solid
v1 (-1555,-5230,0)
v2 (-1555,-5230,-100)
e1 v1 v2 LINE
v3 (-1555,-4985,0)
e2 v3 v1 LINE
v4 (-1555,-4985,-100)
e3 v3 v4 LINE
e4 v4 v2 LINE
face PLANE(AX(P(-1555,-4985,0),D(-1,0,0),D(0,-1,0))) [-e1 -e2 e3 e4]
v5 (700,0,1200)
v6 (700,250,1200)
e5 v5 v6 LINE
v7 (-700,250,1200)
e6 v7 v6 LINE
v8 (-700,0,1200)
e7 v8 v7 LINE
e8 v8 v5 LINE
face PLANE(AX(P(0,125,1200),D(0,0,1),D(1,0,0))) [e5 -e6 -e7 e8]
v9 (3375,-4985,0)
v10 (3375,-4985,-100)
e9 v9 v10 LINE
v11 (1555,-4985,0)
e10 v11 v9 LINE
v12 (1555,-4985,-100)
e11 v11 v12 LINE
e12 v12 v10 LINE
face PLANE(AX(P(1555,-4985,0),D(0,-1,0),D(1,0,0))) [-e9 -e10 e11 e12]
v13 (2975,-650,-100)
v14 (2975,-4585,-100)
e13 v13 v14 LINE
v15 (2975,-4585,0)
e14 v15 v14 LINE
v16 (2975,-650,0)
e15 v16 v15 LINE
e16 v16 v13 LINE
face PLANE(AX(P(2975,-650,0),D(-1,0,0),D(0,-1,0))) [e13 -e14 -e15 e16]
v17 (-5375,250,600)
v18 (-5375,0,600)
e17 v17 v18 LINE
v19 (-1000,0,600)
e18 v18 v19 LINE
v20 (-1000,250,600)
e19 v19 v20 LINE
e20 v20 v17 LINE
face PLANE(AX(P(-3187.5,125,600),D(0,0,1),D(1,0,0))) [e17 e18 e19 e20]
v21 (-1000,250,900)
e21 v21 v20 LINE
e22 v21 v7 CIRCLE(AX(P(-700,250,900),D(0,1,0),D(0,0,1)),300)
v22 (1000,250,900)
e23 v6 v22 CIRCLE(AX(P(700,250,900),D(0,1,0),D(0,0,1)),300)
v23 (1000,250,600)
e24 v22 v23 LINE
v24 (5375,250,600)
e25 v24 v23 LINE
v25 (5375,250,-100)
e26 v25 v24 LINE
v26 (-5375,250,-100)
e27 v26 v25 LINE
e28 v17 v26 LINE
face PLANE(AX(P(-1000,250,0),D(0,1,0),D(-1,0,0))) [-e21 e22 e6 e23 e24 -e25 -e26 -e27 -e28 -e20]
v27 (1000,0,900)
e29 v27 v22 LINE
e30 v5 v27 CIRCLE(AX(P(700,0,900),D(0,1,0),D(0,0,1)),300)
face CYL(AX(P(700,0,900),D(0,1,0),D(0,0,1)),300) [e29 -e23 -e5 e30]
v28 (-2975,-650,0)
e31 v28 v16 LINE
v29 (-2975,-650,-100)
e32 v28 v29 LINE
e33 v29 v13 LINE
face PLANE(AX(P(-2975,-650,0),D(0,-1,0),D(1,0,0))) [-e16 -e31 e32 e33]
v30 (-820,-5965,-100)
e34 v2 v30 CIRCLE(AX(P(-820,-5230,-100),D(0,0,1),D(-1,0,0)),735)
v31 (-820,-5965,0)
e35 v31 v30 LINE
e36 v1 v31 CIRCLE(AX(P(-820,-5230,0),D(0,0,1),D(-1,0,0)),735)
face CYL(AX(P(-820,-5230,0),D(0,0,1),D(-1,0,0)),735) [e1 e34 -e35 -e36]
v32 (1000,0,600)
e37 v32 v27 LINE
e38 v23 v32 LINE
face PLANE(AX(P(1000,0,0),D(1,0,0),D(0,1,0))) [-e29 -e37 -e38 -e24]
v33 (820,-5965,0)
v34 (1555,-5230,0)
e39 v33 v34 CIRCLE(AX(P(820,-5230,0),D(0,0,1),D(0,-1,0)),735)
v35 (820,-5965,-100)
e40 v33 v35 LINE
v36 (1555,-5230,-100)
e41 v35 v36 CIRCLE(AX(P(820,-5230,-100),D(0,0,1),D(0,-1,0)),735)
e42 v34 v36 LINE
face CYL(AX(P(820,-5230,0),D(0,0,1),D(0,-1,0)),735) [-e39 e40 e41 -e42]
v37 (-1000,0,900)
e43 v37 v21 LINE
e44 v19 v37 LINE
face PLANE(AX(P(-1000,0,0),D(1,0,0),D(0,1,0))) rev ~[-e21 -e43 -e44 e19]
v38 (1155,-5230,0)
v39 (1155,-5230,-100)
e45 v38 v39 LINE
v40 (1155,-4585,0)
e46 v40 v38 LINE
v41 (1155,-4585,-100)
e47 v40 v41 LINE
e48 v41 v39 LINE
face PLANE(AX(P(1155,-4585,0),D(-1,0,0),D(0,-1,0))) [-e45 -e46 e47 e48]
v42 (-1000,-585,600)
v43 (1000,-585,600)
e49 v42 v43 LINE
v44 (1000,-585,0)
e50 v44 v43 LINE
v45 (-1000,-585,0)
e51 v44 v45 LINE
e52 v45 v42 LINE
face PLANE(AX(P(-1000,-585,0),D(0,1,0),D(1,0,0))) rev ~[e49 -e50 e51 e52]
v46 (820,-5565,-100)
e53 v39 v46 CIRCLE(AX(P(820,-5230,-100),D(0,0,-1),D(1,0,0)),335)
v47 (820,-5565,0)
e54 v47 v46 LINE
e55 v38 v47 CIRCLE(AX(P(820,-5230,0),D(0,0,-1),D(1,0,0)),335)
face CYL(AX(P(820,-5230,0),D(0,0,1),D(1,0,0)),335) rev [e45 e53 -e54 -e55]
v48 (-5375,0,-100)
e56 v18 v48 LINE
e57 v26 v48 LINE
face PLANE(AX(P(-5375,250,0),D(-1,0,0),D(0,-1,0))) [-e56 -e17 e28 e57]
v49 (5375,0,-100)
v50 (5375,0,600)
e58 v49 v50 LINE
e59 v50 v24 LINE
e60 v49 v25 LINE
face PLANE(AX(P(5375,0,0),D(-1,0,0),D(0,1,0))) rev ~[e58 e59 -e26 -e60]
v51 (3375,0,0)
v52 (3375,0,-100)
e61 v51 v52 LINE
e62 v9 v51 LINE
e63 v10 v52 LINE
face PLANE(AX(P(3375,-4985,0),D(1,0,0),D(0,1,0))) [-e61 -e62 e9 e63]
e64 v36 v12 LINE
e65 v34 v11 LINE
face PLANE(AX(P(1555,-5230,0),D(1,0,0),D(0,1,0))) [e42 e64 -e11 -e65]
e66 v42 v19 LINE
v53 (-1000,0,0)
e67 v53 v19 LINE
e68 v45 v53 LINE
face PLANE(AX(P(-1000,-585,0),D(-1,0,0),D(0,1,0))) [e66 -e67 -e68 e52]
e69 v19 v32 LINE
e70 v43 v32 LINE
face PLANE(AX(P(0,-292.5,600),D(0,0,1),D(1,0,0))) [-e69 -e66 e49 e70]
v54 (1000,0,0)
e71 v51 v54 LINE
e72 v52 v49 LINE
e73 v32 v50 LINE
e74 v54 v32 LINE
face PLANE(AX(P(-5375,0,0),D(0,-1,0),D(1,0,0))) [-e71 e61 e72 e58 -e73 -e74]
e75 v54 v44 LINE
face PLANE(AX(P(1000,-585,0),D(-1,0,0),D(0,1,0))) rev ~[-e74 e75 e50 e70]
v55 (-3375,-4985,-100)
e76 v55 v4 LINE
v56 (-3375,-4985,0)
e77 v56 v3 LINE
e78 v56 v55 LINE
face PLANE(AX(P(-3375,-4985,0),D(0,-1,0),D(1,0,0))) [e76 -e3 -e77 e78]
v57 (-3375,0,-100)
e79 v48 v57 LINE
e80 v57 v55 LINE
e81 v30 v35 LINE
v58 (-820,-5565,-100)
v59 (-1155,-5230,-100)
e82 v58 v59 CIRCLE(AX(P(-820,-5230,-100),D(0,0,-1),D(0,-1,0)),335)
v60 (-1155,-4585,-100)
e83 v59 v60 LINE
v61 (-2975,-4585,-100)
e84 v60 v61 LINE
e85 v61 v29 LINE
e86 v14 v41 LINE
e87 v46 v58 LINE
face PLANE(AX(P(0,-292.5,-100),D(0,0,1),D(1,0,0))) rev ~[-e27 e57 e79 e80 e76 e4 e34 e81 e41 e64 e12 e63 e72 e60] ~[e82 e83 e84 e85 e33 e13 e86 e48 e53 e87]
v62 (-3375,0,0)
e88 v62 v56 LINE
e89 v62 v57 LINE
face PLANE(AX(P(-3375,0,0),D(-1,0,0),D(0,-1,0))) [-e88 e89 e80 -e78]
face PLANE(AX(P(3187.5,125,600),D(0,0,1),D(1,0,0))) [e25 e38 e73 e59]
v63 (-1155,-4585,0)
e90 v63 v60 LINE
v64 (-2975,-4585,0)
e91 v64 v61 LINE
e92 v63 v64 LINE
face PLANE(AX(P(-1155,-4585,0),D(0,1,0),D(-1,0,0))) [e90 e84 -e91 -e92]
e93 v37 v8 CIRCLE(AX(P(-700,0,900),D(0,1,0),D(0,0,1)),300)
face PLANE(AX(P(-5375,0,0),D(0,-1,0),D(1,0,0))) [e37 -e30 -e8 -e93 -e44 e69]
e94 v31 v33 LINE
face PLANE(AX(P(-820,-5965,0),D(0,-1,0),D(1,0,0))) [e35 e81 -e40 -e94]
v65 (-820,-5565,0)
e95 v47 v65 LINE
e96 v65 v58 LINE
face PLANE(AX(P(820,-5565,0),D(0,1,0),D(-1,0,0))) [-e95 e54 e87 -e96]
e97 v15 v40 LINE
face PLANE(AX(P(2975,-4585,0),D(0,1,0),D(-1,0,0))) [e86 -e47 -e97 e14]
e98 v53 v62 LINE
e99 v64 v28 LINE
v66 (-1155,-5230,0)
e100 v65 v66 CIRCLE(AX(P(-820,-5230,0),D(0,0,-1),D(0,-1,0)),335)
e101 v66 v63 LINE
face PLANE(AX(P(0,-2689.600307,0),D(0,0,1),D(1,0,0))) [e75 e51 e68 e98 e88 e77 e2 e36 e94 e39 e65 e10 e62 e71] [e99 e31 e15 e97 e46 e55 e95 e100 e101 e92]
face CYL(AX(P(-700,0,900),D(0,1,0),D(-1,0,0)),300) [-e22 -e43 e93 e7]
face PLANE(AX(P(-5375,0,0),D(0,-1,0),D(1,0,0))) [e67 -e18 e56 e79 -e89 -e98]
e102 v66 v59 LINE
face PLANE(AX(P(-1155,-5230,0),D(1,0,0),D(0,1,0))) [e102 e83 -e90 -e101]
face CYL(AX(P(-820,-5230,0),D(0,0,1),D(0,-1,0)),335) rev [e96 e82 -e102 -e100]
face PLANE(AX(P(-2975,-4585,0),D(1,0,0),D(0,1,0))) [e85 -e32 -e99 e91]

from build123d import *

# Parameters (mm, degrees)
F1_DEPTH      = 100
F0_W          = 2000
F0_H          = 250
F2_DEPTH      = 1200
F2_DEPTH_BACK = 100
F3_DEPTH      = 600
F3_DEPTH_BACK = 100
F0_H_2        = 585
F4_DEPTH      = 600
F4_DEPTH_BACK = 100
F5_R          = 300


with BuildPart() as f1:
    # F0 (on Top) → F1 (new body)
    with BuildSketch(Plane.XY):
        with BuildLine():
            Line((-1000, 0), (-3375, 0))
            Line((-3375, 0), (-3375, -4985))
            Line((-3375, -4985), (-1555, -4985))
            Line((-1555, -4985), (-1555, -5230))
            ThreePointArc((-1555, -5230), (-1339.7234841721, -5749.7234841721), (-820, -5965))
            Line((-820, -5965), (820, -5965))
            ThreePointArc((820, -5965), (1339.7234841721, -5749.7234841721), (1555, -5230))
            Line((1555, -5230), (1555, -4985))
            Line((1555, -4985), (3375, -4985))
            Line((3375, -4985), (3375, 0))
            Line((3375, 0), (1000, 0))
            Line((1000, 0), (1000, -585))
            Line((1000, -585), (-1000, -585))
            Line((-1000, -585), (-1000, 0))
        make_face()
        with BuildLine():
            Line((-2975, -4585), (-2975, -650))
            Line((-2975, -650), (2975, -650))
            Line((2975, -650), (2975, -4585))
            Line((2975, -4585), (1155, -4585))
            Line((1155, -4585), (1155, -5230))
            ThreePointArc((1155, -5230), (1056.8807716975, -5466.8807716975), (820, -5565))
            Line((820, -5565), (-820, -5565))
            ThreePointArc((-820, -5565), (-1056.8807716975, -5466.8807716975), (-1155, -5230))
            Line((-1155, -5230), (-1155, -4585))
            Line((-1155, -4585), (-2975, -4585))
        make_face(mode=Mode.SUBTRACT)
    extrude(amount=-F1_DEPTH)

    # F0 (on Top) → F2 (join, two sides)
    with BuildSketch(Plane.XY) as f2_sk:
        with Locations((0, 125)):
            Rectangle(F0_W, F0_H)
    extrude(amount=F2_DEPTH)
    extrude(f2_sk.sketch, amount=-F2_DEPTH_BACK)

    # F0 (on Top) → F3 (join, two sides)
    with BuildSketch(Plane.XY) as f3_sk:
        Polygon((-5375, 0), (-3375, 0), (-1000, 0), (-1000, 250), (-5375, 250), align=None)
        Polygon((1000, 250), (1000, 0), (3375, 0), (5375, 0), (5375, 250), align=None)
    extrude(amount=F3_DEPTH)
    extrude(f3_sk.sketch, amount=-F3_DEPTH_BACK)

    # F0 (on Top) → F4 (join, two sides)
    with BuildSketch(Plane.XY) as f4_sk:
        with Locations((0, -292.5)):
            Rectangle(F0_W, F0_H_2)
    extrude(amount=F4_DEPTH)
    extrude(f4_sk.sketch, amount=-F4_DEPTH_BACK)

    # F5
    f5_edges = [f1.edges().sort_by_distance(p)[0] for p in [
        (-1000, 125, 1200),
        (1000, 125, 1200),
    ]]
    fillet(f5_edges, radius=F5_R)


solid = f1.part
